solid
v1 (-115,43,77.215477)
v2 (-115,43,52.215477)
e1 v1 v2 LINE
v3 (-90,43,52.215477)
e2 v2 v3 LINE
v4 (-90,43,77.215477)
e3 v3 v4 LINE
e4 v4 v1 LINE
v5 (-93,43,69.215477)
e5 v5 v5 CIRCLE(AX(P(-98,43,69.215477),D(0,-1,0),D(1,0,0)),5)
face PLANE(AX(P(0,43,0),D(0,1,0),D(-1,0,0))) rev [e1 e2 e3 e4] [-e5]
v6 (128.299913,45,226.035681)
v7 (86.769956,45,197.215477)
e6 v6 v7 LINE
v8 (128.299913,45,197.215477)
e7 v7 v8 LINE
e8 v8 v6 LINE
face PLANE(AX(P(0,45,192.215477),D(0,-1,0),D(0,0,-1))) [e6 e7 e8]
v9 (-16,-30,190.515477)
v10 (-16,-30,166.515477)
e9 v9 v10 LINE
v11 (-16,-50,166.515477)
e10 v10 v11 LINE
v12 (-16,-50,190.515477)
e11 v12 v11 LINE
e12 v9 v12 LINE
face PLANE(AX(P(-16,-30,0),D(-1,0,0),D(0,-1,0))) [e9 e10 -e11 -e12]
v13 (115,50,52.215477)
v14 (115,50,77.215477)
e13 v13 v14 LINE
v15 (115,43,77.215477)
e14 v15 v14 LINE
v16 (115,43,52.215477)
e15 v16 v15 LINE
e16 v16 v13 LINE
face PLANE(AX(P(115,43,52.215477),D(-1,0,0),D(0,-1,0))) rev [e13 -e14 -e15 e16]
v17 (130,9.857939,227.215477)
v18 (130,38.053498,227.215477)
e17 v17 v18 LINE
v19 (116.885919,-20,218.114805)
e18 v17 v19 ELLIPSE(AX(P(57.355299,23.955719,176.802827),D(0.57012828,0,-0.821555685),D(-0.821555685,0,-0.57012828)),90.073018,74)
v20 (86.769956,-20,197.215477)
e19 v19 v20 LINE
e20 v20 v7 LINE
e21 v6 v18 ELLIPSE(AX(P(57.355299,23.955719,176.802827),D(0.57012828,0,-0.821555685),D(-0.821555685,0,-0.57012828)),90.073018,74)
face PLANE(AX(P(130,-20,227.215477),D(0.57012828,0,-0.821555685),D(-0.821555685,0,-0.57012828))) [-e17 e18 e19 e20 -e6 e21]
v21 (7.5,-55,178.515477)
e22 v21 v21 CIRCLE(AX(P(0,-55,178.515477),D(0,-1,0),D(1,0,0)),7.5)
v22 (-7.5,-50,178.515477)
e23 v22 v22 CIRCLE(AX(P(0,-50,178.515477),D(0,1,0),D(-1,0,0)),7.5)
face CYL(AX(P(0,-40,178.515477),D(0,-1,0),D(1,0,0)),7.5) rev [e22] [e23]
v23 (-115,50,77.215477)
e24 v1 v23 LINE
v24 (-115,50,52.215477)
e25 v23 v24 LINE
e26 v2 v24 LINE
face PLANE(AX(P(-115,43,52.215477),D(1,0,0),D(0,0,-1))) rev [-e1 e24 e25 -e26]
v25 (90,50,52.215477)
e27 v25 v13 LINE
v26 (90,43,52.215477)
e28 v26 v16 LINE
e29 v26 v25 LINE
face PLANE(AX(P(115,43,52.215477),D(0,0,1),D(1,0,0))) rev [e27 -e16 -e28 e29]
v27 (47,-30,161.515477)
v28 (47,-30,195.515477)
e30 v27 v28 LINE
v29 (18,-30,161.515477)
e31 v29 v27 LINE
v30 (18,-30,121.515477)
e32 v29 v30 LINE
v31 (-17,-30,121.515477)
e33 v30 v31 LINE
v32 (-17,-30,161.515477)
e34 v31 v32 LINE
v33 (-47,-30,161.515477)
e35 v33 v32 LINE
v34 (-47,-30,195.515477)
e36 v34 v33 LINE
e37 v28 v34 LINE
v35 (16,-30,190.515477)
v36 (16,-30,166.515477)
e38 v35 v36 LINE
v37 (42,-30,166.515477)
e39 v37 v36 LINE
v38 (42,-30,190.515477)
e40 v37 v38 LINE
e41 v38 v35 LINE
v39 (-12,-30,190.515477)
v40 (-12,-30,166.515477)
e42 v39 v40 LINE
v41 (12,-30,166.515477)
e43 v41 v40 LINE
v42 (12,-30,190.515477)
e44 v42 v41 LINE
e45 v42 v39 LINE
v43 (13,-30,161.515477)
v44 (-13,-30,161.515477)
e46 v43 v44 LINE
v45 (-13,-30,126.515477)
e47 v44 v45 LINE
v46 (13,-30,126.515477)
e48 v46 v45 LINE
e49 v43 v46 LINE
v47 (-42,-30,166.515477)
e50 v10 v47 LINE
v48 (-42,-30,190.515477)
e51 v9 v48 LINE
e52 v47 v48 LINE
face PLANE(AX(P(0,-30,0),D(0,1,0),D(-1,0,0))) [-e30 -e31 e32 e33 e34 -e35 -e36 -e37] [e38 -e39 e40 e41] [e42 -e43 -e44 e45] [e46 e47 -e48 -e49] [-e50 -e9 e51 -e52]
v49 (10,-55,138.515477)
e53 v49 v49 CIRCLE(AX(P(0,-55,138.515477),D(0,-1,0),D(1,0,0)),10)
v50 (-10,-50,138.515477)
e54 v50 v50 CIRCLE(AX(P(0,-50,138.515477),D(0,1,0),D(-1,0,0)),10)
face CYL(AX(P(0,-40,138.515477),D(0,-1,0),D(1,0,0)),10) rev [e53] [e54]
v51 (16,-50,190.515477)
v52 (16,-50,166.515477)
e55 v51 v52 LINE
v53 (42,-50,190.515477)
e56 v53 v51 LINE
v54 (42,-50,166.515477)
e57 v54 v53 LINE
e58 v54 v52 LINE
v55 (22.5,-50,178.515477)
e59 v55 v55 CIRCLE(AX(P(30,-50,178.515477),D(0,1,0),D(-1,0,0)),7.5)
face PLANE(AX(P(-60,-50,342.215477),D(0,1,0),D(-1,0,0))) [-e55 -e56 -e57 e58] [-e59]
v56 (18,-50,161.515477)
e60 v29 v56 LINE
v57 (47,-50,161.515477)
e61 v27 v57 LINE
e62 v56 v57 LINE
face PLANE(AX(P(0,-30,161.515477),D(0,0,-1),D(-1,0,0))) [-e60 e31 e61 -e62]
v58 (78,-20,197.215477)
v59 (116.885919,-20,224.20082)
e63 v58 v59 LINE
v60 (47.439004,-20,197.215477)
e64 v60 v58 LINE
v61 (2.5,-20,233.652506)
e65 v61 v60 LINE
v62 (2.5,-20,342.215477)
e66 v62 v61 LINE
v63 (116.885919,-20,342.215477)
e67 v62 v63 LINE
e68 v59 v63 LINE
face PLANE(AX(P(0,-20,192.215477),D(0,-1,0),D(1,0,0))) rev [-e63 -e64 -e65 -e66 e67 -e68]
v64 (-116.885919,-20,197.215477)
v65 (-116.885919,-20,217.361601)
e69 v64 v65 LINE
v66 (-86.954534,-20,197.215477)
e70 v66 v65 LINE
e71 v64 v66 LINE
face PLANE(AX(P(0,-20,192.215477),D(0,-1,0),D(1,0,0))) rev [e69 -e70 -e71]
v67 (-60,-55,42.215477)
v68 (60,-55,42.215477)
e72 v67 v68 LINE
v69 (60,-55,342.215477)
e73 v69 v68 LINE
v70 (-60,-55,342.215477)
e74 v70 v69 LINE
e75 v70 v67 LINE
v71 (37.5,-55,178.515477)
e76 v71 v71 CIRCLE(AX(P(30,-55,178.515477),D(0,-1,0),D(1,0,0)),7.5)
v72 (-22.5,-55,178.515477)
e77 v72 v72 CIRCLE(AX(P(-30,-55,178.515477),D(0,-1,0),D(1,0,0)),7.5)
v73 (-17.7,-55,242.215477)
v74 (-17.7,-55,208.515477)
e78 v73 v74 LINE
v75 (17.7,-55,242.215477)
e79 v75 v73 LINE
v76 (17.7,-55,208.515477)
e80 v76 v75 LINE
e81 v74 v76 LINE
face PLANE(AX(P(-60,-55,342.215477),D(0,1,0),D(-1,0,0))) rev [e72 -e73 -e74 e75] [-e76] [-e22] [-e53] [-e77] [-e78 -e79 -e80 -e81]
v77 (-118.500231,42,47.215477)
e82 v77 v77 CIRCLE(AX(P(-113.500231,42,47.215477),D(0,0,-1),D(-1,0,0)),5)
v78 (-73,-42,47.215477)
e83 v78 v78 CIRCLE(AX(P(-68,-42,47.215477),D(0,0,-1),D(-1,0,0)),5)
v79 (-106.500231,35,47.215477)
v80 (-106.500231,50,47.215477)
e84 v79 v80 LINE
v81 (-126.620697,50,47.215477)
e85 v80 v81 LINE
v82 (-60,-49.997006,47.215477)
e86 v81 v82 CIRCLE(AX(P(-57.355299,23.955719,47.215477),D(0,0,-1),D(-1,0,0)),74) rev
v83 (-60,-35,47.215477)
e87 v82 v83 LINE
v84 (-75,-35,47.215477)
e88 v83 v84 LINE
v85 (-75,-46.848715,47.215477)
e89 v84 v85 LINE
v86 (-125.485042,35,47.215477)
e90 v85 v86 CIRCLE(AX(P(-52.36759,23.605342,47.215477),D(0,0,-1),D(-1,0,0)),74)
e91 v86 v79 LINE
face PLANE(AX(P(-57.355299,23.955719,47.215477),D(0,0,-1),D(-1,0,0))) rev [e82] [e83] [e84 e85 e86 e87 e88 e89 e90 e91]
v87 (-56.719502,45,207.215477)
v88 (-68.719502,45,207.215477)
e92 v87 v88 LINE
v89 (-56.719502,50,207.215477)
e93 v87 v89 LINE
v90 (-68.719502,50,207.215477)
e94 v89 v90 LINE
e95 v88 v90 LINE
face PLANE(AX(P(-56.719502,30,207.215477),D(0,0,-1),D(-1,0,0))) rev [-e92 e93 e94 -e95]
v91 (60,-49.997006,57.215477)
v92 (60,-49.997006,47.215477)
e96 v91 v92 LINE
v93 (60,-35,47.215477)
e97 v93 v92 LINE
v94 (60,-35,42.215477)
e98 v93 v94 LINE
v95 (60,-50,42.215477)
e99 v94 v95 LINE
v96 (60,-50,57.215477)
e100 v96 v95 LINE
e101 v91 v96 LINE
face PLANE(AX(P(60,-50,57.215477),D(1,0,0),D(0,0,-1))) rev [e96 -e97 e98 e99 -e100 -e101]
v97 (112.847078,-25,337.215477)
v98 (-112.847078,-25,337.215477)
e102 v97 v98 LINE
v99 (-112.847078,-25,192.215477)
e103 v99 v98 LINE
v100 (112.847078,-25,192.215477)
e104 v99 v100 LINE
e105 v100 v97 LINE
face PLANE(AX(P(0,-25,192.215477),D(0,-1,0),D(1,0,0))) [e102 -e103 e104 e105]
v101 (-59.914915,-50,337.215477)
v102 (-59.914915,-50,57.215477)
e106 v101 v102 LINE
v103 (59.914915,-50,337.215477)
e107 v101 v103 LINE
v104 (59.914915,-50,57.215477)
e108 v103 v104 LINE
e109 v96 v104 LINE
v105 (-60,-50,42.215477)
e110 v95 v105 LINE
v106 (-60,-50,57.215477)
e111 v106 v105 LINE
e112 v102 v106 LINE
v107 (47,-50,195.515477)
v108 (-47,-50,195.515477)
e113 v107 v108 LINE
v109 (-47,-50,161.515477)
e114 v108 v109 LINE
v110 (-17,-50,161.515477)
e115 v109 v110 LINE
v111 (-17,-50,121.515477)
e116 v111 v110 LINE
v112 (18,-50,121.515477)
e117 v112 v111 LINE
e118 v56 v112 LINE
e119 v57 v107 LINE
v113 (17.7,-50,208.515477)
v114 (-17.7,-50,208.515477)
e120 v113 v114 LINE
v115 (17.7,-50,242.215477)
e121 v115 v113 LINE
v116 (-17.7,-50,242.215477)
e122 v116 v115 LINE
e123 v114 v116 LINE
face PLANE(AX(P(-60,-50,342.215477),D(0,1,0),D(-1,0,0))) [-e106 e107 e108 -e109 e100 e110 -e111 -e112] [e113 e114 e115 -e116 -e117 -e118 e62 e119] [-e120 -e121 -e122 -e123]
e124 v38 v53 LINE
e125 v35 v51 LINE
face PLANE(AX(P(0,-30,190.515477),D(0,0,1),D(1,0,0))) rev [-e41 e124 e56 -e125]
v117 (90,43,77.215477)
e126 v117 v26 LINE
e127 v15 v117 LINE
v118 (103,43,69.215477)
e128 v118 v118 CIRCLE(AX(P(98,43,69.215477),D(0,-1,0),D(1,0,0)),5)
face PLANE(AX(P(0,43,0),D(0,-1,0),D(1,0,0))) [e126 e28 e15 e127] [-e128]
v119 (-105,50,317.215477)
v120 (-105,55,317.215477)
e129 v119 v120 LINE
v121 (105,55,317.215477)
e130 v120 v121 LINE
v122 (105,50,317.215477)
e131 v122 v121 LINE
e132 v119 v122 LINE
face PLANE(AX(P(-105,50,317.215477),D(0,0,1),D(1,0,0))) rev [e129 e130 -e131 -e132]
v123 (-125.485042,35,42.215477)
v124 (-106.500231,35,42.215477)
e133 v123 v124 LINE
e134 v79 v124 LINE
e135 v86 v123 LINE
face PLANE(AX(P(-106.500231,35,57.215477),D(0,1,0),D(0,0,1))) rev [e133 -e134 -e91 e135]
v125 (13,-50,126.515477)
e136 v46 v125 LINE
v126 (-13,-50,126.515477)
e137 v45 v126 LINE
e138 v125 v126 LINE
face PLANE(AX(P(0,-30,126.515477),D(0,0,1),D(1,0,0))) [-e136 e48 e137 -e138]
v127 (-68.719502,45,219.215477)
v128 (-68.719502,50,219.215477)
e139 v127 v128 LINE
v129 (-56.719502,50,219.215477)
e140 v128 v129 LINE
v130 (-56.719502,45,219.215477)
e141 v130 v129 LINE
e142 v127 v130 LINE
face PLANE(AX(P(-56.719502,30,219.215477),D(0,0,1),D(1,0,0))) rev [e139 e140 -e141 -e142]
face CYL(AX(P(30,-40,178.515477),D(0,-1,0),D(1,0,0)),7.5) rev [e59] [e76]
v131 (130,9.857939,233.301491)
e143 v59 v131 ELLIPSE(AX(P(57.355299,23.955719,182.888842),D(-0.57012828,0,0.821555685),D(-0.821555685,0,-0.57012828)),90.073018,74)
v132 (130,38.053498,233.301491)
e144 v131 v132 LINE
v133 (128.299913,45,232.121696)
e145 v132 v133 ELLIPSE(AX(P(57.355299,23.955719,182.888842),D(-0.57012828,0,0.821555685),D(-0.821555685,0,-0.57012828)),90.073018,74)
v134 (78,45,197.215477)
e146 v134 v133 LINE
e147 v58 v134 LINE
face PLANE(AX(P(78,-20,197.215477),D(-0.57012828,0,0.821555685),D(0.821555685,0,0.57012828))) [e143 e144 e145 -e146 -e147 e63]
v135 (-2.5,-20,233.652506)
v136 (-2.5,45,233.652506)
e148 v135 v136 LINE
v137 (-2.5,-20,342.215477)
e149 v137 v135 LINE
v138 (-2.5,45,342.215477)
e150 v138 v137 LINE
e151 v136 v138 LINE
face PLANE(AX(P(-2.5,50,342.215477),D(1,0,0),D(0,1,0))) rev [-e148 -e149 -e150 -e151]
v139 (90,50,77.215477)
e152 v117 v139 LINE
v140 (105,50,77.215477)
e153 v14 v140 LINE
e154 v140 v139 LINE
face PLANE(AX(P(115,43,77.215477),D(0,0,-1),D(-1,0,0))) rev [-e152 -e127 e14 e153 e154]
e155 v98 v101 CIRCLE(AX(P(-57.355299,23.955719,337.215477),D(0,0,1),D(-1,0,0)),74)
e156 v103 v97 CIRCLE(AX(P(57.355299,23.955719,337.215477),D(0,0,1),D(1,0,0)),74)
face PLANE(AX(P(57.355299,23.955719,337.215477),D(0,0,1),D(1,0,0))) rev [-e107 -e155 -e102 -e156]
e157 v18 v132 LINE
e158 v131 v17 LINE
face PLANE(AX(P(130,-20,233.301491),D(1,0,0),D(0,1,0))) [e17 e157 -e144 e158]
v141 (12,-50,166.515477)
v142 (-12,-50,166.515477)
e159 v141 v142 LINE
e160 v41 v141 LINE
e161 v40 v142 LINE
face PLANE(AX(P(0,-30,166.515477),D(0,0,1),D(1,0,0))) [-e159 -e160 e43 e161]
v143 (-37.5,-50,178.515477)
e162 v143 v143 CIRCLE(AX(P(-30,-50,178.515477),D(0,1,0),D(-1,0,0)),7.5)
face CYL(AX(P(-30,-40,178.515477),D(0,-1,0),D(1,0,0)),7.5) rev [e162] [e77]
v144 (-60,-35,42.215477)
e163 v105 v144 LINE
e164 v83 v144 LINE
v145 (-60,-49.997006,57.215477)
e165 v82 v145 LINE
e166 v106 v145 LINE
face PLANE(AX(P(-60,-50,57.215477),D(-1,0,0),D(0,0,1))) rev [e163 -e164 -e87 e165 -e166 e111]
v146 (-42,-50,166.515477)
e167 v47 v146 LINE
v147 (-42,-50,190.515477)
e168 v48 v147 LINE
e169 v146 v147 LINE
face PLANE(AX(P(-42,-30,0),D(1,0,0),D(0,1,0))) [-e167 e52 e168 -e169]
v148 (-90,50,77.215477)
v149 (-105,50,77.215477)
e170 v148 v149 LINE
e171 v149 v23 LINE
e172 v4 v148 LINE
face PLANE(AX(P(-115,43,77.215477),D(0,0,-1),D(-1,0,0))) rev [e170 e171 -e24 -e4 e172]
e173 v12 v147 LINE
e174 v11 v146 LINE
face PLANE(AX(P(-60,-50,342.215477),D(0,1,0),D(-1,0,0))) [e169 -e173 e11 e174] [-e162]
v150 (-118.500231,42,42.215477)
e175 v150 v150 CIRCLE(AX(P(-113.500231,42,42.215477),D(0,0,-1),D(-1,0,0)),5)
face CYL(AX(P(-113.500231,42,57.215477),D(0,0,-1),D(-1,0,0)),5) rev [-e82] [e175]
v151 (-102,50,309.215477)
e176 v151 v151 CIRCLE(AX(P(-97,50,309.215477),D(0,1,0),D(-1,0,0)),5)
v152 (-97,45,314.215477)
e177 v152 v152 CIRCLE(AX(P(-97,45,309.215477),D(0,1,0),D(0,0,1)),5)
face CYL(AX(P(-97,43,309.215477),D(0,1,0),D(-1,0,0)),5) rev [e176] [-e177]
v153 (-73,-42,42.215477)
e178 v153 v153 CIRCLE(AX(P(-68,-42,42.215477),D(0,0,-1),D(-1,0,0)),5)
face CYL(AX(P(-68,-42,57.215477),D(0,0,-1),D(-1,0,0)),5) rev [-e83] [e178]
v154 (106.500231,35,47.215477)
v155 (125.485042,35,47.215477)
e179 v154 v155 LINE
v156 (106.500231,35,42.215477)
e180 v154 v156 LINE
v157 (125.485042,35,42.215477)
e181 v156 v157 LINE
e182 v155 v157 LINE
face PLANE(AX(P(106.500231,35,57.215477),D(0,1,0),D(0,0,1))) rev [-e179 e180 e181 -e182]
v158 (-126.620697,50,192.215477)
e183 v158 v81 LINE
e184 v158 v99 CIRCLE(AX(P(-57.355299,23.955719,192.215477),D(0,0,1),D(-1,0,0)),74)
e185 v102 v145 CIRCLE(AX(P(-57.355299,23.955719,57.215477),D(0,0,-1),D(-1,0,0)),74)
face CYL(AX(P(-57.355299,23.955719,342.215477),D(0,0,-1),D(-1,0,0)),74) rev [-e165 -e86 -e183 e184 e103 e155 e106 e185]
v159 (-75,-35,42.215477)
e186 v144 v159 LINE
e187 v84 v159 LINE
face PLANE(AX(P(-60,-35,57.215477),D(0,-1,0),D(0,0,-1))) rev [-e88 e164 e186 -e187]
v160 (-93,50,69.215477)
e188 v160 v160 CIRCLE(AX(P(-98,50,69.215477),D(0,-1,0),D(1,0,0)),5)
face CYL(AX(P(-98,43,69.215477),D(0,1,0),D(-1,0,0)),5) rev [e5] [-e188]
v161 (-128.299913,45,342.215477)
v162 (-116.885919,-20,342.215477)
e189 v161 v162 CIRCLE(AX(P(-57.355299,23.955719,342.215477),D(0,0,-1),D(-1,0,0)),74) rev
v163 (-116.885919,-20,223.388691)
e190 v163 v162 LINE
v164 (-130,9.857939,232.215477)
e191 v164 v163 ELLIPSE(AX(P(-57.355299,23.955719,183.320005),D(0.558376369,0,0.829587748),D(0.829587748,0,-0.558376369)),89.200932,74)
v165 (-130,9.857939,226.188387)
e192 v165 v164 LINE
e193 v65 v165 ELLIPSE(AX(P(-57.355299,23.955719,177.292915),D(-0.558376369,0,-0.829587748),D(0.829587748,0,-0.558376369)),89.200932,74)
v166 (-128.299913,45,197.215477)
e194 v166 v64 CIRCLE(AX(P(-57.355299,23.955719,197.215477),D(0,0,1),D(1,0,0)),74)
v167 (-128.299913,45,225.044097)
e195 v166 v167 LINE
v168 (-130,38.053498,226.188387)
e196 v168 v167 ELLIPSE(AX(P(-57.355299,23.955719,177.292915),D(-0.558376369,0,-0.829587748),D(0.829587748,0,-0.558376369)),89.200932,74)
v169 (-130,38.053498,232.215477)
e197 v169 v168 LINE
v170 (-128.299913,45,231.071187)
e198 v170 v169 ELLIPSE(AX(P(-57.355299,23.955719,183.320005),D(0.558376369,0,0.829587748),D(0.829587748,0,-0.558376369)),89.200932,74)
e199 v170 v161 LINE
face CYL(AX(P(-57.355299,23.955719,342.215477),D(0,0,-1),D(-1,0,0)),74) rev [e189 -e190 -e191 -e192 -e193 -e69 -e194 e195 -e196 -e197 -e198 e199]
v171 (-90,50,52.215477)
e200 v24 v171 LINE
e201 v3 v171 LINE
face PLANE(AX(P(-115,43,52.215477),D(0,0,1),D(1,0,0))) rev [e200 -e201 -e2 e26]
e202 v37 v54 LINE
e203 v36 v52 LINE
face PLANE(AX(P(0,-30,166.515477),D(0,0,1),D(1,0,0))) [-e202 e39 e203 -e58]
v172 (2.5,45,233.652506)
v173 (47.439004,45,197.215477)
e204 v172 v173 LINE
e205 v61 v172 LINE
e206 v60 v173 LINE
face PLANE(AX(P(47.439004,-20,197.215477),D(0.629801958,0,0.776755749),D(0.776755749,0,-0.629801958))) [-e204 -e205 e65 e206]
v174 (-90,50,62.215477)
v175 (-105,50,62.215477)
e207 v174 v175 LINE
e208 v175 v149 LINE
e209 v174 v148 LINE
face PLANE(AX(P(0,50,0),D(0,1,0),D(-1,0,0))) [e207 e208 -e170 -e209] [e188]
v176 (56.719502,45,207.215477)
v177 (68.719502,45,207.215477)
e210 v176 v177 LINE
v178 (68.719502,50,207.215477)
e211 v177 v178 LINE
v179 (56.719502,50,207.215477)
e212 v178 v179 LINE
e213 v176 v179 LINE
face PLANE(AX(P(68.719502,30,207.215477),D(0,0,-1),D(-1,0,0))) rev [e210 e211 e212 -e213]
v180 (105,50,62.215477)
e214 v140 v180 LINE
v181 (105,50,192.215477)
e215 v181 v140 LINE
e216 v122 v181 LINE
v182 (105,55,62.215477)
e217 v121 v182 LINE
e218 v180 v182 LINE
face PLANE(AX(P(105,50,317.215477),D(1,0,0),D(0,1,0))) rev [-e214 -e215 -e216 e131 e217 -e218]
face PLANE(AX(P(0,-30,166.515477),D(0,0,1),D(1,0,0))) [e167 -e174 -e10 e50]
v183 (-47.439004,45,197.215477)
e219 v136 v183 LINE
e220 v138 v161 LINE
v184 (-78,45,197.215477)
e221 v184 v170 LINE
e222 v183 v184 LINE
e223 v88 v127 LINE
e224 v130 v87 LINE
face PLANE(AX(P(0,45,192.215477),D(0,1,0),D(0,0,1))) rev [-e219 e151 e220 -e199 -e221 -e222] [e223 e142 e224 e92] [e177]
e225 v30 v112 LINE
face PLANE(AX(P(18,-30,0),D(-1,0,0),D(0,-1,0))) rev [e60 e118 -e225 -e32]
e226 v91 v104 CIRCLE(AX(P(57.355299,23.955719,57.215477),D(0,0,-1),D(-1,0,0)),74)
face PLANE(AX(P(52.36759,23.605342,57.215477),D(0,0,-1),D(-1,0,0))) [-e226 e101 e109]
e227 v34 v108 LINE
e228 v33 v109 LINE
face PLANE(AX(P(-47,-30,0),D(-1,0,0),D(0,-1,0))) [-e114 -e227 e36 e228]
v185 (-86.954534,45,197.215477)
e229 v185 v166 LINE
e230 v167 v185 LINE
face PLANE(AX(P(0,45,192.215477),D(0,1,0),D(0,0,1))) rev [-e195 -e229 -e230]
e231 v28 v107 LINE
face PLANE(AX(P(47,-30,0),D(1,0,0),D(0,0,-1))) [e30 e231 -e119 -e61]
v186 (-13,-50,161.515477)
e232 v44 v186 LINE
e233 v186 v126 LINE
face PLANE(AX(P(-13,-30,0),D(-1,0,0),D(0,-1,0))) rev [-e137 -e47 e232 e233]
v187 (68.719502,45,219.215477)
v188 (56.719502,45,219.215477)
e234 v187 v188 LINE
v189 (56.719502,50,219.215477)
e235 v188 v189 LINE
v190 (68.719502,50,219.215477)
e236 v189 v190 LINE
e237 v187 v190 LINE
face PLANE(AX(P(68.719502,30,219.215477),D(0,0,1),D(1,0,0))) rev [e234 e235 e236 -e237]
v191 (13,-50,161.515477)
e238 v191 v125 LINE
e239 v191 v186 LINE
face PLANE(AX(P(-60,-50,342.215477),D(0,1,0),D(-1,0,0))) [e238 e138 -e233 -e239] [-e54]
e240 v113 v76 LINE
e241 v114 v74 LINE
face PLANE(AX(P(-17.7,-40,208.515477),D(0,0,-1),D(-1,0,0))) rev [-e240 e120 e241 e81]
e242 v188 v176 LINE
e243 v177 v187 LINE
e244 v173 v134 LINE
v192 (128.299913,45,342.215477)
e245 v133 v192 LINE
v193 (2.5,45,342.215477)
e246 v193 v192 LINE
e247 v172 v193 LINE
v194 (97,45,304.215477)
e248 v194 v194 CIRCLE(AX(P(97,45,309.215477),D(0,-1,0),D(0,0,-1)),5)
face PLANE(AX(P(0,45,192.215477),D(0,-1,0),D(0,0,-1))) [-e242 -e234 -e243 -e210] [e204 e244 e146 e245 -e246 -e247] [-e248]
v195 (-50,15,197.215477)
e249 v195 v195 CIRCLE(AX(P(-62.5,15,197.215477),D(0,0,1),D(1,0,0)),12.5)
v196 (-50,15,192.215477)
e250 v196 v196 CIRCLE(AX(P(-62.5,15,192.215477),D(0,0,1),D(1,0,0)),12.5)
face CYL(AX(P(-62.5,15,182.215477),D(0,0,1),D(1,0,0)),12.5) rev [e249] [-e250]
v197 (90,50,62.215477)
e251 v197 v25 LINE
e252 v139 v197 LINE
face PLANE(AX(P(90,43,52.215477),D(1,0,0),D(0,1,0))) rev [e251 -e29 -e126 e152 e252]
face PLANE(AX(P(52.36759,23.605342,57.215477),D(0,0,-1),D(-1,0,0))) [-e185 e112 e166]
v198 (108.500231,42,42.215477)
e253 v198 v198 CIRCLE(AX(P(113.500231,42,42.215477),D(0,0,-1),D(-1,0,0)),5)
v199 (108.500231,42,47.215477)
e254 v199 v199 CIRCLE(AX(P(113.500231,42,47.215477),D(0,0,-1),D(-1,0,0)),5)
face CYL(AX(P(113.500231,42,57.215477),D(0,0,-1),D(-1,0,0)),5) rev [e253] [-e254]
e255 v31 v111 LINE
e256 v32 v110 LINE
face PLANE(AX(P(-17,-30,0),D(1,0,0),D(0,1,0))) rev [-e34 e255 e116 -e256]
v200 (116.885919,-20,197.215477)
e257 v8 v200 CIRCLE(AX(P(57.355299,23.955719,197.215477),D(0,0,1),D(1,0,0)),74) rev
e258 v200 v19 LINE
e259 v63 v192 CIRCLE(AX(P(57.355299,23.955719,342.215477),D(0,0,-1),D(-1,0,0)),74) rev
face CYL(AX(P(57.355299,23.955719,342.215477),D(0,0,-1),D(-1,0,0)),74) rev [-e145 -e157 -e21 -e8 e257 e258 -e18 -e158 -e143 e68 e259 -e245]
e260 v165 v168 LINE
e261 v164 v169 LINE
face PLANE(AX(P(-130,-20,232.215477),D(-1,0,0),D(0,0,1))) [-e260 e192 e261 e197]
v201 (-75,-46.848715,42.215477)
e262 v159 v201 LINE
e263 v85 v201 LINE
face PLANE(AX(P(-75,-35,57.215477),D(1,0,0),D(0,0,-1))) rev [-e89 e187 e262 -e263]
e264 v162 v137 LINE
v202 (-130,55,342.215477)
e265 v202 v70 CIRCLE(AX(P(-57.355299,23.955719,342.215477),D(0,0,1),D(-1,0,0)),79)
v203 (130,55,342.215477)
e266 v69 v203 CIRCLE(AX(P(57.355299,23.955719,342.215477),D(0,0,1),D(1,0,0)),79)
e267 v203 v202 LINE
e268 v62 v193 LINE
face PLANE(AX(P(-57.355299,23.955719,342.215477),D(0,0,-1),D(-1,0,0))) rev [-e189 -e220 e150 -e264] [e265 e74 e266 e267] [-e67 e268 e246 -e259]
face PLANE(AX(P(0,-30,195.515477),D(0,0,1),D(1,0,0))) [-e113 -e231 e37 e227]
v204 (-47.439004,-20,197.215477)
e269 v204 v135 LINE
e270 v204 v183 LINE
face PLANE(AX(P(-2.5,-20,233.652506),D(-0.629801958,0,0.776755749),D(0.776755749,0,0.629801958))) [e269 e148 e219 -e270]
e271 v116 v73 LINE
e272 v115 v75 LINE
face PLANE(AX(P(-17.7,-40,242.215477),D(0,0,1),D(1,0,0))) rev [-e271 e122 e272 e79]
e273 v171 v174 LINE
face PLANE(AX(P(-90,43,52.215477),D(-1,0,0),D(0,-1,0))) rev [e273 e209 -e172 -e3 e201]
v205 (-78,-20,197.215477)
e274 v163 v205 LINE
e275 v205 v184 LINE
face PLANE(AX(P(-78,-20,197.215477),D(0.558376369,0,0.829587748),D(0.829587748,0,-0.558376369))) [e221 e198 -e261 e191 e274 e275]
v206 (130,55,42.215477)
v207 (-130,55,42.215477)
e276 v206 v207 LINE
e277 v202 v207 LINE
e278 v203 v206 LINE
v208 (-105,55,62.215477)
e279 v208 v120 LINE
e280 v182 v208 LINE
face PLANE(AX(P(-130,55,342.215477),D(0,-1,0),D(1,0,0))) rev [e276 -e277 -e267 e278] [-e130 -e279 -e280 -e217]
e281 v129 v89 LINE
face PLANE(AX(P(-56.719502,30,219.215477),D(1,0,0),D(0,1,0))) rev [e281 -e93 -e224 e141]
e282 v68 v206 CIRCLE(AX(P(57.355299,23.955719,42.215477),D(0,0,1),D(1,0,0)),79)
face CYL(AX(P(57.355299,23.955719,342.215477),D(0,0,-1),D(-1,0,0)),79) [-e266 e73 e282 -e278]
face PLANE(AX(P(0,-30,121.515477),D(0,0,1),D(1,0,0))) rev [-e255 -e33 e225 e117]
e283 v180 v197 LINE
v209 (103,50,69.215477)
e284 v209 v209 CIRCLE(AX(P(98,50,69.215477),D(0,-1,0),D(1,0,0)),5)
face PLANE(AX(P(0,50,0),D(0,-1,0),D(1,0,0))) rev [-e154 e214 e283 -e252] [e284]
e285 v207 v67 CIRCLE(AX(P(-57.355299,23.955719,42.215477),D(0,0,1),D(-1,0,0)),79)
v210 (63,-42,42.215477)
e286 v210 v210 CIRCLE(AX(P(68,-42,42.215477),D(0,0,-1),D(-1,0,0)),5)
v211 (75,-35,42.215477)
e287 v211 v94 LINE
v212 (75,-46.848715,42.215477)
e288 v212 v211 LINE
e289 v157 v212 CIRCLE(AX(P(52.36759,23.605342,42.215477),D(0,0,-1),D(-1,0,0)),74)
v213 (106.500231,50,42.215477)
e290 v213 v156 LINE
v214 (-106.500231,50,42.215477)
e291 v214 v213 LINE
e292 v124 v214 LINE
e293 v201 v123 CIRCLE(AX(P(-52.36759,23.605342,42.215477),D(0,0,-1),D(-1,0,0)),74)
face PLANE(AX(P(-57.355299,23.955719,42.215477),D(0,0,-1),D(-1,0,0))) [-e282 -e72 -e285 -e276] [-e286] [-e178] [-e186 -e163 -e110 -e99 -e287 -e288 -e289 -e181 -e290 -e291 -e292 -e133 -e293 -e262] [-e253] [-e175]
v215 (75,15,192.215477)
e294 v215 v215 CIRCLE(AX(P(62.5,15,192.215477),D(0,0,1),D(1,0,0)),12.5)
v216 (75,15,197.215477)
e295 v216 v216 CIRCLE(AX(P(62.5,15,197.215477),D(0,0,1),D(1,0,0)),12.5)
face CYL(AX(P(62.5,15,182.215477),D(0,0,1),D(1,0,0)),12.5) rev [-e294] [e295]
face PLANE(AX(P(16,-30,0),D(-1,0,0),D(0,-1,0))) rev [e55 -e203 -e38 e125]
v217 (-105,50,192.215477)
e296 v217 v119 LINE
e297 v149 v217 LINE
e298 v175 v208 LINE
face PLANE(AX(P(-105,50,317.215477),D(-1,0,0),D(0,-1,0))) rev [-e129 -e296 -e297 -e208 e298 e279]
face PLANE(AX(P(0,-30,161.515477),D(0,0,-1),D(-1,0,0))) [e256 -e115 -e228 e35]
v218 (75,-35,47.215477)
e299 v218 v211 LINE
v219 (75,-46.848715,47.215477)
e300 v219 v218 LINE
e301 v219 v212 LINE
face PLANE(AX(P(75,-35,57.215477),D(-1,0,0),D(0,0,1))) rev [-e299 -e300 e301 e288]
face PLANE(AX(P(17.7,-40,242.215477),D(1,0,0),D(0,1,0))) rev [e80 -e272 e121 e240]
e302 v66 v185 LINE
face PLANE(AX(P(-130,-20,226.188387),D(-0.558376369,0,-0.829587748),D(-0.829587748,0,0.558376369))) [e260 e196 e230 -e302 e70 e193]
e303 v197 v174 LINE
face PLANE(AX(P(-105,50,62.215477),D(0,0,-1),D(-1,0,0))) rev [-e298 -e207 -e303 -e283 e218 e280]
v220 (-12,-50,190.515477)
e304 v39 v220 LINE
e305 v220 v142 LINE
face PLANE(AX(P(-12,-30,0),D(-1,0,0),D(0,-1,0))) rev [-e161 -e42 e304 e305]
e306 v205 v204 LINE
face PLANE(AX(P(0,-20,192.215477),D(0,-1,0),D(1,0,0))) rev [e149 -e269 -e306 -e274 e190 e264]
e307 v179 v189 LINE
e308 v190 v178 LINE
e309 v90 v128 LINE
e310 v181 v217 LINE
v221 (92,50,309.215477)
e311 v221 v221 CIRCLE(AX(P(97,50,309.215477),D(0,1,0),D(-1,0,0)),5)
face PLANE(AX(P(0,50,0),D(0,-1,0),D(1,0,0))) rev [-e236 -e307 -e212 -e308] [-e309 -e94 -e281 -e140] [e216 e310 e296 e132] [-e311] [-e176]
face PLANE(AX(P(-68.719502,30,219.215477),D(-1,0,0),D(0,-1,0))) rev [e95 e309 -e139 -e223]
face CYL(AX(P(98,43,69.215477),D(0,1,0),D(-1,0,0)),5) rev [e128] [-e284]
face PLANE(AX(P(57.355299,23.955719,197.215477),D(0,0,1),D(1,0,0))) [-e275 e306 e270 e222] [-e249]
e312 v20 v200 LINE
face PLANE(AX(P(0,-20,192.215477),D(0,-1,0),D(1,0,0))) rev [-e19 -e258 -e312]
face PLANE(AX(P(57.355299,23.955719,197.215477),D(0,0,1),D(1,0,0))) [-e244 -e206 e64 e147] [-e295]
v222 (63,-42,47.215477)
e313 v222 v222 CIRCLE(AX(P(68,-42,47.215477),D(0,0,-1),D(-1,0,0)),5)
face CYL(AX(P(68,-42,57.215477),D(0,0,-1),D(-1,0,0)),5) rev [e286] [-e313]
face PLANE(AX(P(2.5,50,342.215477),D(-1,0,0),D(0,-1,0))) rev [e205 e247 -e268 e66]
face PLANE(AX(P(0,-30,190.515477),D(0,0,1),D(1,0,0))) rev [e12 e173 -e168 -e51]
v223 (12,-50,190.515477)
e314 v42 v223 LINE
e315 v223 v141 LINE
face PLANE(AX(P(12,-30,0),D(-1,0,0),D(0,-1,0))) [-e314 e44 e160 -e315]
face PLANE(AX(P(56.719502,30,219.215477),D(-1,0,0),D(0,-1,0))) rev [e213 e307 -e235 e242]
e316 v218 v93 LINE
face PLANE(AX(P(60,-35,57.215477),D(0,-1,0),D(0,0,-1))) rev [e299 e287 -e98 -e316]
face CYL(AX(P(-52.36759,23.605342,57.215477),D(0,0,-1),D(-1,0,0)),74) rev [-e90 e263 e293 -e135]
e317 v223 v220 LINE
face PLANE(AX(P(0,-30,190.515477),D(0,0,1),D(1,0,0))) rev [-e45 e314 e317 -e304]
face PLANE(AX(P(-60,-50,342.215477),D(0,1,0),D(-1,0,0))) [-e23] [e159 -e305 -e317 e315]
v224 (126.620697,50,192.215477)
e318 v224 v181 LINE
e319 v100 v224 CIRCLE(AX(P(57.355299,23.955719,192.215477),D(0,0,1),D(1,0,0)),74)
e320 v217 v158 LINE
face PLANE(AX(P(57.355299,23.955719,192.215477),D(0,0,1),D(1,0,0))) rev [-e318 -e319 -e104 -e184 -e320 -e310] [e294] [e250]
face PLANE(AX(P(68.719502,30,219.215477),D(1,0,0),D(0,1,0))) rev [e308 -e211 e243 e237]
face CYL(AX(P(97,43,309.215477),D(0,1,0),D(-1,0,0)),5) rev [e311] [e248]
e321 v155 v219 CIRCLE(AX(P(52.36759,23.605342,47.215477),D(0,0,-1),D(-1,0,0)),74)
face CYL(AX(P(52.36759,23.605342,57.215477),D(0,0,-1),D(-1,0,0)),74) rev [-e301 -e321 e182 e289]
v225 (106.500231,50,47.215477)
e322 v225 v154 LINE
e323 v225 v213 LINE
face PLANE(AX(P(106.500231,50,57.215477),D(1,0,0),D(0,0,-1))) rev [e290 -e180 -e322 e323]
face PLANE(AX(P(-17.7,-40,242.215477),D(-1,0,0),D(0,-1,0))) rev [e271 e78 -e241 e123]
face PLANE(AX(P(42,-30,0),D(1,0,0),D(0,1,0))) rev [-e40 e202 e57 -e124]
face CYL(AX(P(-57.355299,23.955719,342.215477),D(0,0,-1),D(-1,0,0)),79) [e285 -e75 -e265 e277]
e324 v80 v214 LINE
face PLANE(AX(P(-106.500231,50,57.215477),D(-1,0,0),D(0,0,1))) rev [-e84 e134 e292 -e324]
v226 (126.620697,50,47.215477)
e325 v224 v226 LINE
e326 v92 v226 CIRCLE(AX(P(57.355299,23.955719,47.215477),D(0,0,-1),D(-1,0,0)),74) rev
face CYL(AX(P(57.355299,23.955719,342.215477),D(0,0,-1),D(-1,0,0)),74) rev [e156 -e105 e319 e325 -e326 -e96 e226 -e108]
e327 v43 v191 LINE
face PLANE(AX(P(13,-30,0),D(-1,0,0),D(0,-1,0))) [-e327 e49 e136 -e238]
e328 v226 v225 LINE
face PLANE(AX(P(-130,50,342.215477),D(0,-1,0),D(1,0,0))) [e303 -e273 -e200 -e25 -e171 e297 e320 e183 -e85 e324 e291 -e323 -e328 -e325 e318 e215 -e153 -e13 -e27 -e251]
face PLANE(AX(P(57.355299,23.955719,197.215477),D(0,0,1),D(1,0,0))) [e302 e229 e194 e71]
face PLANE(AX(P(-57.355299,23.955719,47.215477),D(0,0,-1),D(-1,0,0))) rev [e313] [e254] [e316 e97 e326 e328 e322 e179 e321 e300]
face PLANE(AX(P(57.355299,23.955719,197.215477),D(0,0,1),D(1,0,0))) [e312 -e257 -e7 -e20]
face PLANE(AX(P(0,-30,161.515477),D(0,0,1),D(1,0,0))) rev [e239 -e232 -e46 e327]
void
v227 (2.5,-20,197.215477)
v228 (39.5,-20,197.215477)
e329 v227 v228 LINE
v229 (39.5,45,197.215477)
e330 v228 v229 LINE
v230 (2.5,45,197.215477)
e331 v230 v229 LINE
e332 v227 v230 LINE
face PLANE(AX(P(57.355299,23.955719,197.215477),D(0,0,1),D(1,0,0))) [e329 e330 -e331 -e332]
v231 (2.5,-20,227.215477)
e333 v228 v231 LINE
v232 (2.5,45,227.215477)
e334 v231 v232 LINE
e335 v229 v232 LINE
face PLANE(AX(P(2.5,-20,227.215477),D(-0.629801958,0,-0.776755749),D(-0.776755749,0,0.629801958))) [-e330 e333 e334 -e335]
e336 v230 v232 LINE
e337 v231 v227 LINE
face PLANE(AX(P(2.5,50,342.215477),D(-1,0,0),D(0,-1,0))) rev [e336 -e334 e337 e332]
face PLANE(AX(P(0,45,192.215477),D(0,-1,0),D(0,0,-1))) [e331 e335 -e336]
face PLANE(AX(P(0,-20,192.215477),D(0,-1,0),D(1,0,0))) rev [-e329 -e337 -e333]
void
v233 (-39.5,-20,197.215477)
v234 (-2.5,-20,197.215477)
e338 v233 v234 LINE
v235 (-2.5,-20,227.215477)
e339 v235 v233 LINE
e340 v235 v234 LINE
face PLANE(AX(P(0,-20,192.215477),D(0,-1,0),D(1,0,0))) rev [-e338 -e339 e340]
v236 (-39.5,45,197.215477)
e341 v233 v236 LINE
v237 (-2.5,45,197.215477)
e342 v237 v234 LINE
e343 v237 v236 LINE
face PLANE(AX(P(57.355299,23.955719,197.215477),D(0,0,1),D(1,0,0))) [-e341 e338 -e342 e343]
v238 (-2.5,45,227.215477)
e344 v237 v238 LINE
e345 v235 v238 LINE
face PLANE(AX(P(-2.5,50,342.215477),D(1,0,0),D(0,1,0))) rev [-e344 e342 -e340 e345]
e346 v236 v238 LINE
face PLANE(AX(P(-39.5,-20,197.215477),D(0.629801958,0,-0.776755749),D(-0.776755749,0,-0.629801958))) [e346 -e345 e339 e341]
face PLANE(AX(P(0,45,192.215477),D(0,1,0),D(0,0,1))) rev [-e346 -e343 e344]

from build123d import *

# Parameters (mm, degrees)
SALIENTE_EXTRUIR1_DEPTH = 300
VACIADO1_START          = 47.215476502
VACIADO1_DEPTH          = 295
CROQUIS3_R              = 7.5
CROQUIS3_R_2            = 10
CROQUIS3_W              = 35.4
CROQUIS3_H              = 33.7
CORTAR_EXTRUIR1_DEPTH   = 15
SALIENTE_EXTRUIR2_START = -150
SALIENTE_EXTRUIR2_DEPTH = 150
VACIADO3_START          = 197.215476502
VACIADO3_DEPTH          = 145
CROQUIS5_W              = 5
CROQUIS5_H              = 70
SALIENTE_EXTRUIR3_DEPTH = 145
CROQUIS6_R              = 12.5
CORTAR_EXTRUIR2_DEPTH   = 15
CROQUIS7_W              = 210
CROQUIS7_H              = 255
CORTAR_EXTRUIR3_DEPTH   = 5
SALIENTE_EXTRUIR4_DEPTH = 70
SALIENTE_EXTRUIR5_START = -150
SALIENTE_EXTRUIR5_DEPTH = 150
CORTAR_EXTRUIR6_START   = -150
CORTAR_EXTRUIR6_DEPTH   = 150
CORTAR_EXTRUIR7_START   = -150
CORTAR_EXTRUIR7_DEPTH   = 150
CORTAR_EXTRUIR9_DEPTH   = 15
CROQUIS19_R             = 5
CORTAR_EXTRUIR10_DEPTH  = 15
SALIENTE_EXTRUIR6_START = -5
SALIENTE_EXTRUIR6_DEPTH = 5
CROQUIS21_W             = 25
CROQUIS21_H             = 25
CROQUIS21_R             = 5
SALIENTE_EXTRUIR7_DEPTH = 7
CROQUIS22_R             = 5
CORTAR_EXTRUIR13_DEPTH  = 7
CROQUIS23_W             = 26
CROQUIS23_H             = 24
CROQUIS23_H_2           = 35
CROQUIS23_W_2           = 24
SALIENTE_EXTRUIR8_DEPTH = 20
CROQUIS24_W             = 12
CROQUIS24_H             = 12
CORTAR_EXTRUIR14_DEPTH  = 20


# Read off the part's stored shape, not the designer's step: Vaciado1, Vaciado3
with BuildPart() as part:
    # Croquis2 → Saliente-Extruir1 (new body)
    with BuildSketch(Plane.XY.offset(42.215476502)):
        with BuildLine():
            Line((-130, 55), (130, 55))
            ThreePointArc((130, 55), (124.004556318, -18.45744493), (60, -55))
            Line((60, -55), (-60, -55))
            ThreePointArc((-60, -55), (-124.004556318, -18.45744493), (-130, 55))
        make_face()
    extrude(amount=SALIENTE_EXTRUIR1_DEPTH)

    # Vaciado1 outline → Vaciado1 (cut)
    with BuildSketch(Plane.XY.offset(VACIADO1_START)):
        with BuildLine():
            ThreePointArc((-126.620697254, 50), (-118.915904499, -17.108764781), (-59.914914782, -50))
            Line((-59.914914782, -50), (59.914914782, -50))
            ThreePointArc((59.914914782, -50), (118.915904499, -17.108764781), (126.620697254, 50))
            Line((126.620697254, 50), (-126.620697254, 50))
        make_face()
    extrude(amount=VACIADO1_DEPTH, mode=Mode.SUBTRACT)

    # Croquis3 → Cortar-Extruir1 (cut)
    with BuildSketch(Plane(origin=(0, -55, 0), x_dir=(-1, 0, 0), z_dir=(0, -1, 0))):
        with Locations(Location((30, -178.515476502, 0), (0, 0, 180))):
            Circle(CROQUIS3_R)
        with Locations(Location((0, -178.515476502, 0), (0, 0, 180))):
            Circle(CROQUIS3_R)
        with Locations(Location((-30, -178.515476502, 0), (0, 0, 180))):
            Circle(CROQUIS3_R)
        with Locations(Location((0, -138.515476502, 0), (0, 0, 180))):
            Circle(CROQUIS3_R_2)
        with Locations((0, -225.365476502)):
            Rectangle(CROQUIS3_W, CROQUIS3_H)
    extrude(amount=-CORTAR_EXTRUIR1_DEPTH, mode=Mode.SUBTRACT)

    # Croquis4 → Saliente-Extruir2 (add)
    with BuildSketch(Plane.XY.offset(342.215476502).offset(SALIENTE_EXTRUIR2_START)):
        with BuildLine():
            Line((0, -25), (-112.847078194, -25))
            ThreePointArc((-112.847078194, -25), (-130.13811515, 10.589281798), (-126.620697254, 50))
            Line((-126.620697254, 50), (0, 50))
            Line((0, 50), (126.620697254, 50))
            ThreePointArc((126.620697254, 50), (130.13811515, 10.589281798), (112.847078194, -25))
            Line((112.847078194, -25), (0, -25))
        make_face()
    extrude(amount=SALIENTE_EXTRUIR2_DEPTH)

    # Vaciado3 outline → Vaciado3 (cut)
    with BuildSketch(Plane.XY.offset(VACIADO3_START)):
        with BuildLine():
            Line((126.620697254, 50), (-126.620697254, 50))
            ThreePointArc((-126.620697254, 50), (-130.649934486, 13.762761692), (-116.885919238, -20))
            Line((-116.885919238, -20), (116.885919238, -20))
            ThreePointArc((116.885919238, -20), (130.649934486, 13.762761692), (126.620697254, 50))
        make_face()
    extrude(amount=VACIADO3_DEPTH, mode=Mode.SUBTRACT)

    # Croquis5 → Saliente-Extruir3 (add)
    with BuildSketch(Plane.XY.offset(197.215476502)):
        with Locations((0, 15)):
            Rectangle(CROQUIS5_W, CROQUIS5_H)
    extrude(amount=SALIENTE_EXTRUIR3_DEPTH)

    # Croquis6 → Cortar-Extruir2 (cut)
    with BuildSketch(Plane.XY.offset(197.215476502)):
        with Locations((-62.5, 15)):
            Circle(CROQUIS6_R)
        with Locations((62.5, 15)):
            Circle(CROQUIS6_R)
    extrude(amount=-CORTAR_EXTRUIR2_DEPTH, mode=Mode.SUBTRACT)

    # Croquis7 → Cortar-Extruir3 (cut)
    with BuildSketch(Plane(origin=(0, 55, 0), x_dir=(1, 0, 0), z_dir=(0, 1, 0))):
        with Locations((0, -189.715476502)):
            Rectangle(CROQUIS7_W, CROQUIS7_H)
    extrude(amount=-CORTAR_EXTRUIR3_DEPTH, mode=Mode.SUBTRACT)

    # Croquis8 → Saliente-Extruir4 (add)
    with BuildSketch(Plane(origin=(0, 50, 0), x_dir=(1, 0, 0), z_dir=(0, 1, 0))):
        Polygon((47.439003576, -197.215476502), (2.5, -233.652506429), (2.5, -227.215476502), (39.5, -197.215476502), align=None)
        Polygon((78, -197.215476502), (130, -233.301491229), (130, -227.215476502), (86.769956122, -197.215476502), align=None)
        Polygon((-2.5, -233.652506429), (-47.439003576, -197.215476502), (-39.5, -197.215476502), (-2.5, -227.215476502), align=None)
        Polygon((-78, -197.215476502), (-130, -232.215476502), (-130, -226.188386524), (-86.954533682, -197.215476502), align=None)
    extrude(amount=-SALIENTE_EXTRUIR4_DEPTH)

    # Croquis10 → Saliente-Extruir5 (add)
    with BuildSketch(Plane.XY.offset(342.215476502).offset(SALIENTE_EXTRUIR5_START)):
        with BuildLine():
            Line((-2.5, 45), (-2.5, 50))
            Line((-2.5, 50), (-126.620697254, 50))
            ThreePointArc((-126.620697254, 50), (-127.504866775, 47.514965781), (-128.299912644, 45))
            Line((-128.299912644, 45), (-126.620697254, 45))
            Line((-126.620697254, 45), (-2.5, 45))
        make_face()
        with BuildLine():
            ThreePointArc((128.299912644, 45), (127.504866775, 47.514965781), (126.620697254, 50))
            Line((126.620697254, 50), (2.5, 50))
            Line((2.5, 50), (2.5, 45))
            Line((2.5, 45), (128.299912644, 45))
        make_face()
    extrude(amount=SALIENTE_EXTRUIR5_DEPTH)

    # Croquis13 → Cortar-Extruir6 (cut)
    with BuildSketch(Plane.XY.offset(342.215476502).offset(CORTAR_EXTRUIR6_START)):
        with BuildLine():
            Line((-130, -7.088562093), (-130, -20))
            Line((-130, -20), (-122.997470988, -20))
            ThreePointArc((-122.997470988, -20), (-126.799457266, -13.707377748), (-130, -7.088562093))
        make_face()
    extrude(amount=CORTAR_EXTRUIR6_DEPTH, mode=Mode.SUBTRACT)

    # Croquis14 → Cortar-Extruir7 (cut)
    with BuildSketch(Plane.XY.offset(342.215476502).offset(CORTAR_EXTRUIR7_START)):
        with BuildLine():
            Line((130, -7.088562093), (130, -20))
            Line((130, -20), (122.997470988, -20))
            ThreePointArc((122.997470988, -20), (126.799457266, -13.707377748), (130, -7.088562093))
        make_face()
    extrude(amount=CORTAR_EXTRUIR7_DEPTH, mode=Mode.SUBTRACT)

    # Croquis18 → Cortar-Extruir9 (cut)
    with BuildSketch(Plane(origin=(0, 0, 42.215476502), x_dir=(-1, 0, 0), z_dir=(0, 0, -1))):
        with BuildLine():
            Line((-106.50023103, 50), (106.50023103, 50))
            Line((106.50023103, 50), (106.50023103, 35))
            Line((106.50023103, 35), (125.485042145, 35))
            ThreePointArc((125.485042145, 35), (115.350222936, -15.242927128), (75, -46.848714508))
            Line((75, -46.848714508), (75, -35))
            Line((75, -35), (60, -35))
            Line((60, -35), (60, -50))
            Line((60, -50), (-60, -50))
            Line((-60, -50), (-60, -35))
            Line((-60, -35), (-75, -35))
            Line((-75, -35), (-75, -46.848714508))
            ThreePointArc((-75, -46.848714508), (-115.350222936, -15.242927128), (-125.485042145, 35))
            Line((-125.485042145, 35), (-106.50023103, 35))
            Line((-106.50023103, 35), (-106.50023103, 50))
        make_face()
    extrude(amount=-CORTAR_EXTRUIR9_DEPTH, mode=Mode.SUBTRACT)

    # Croquis19 → Cortar-Extruir10 (cut)
    with BuildSketch(Plane(origin=(0, 0, 42.215476502), x_dir=(-1, 0, 0), z_dir=(0, 0, -1))):
        with Locations((-113.50023103, 42)):
            Circle(CROQUIS19_R)
        with Locations((113.50023103, 42)):
            Circle(CROQUIS19_R)
        with Locations((68, -42)):
            Circle(CROQUIS19_R)
        with Locations((-68, -42)):
            Circle(CROQUIS19_R)
    extrude(amount=-CORTAR_EXTRUIR10_DEPTH, mode=Mode.SUBTRACT)

    # Croquis20 → Saliente-Extruir6 (add)
    with BuildSketch(Plane.XY.offset(342.215476502).offset(SALIENTE_EXTRUIR6_START)):
        with BuildLine():
            Line((112.847078194, -25), (-112.847078194, -25))
            ThreePointArc((-112.847078194, -25), (-88.958164591, -42.956603327), (-59.914914782, -50))
            Line((-59.914914782, -50), (59.914914782, -50))
            ThreePointArc((59.914914782, -50), (88.958164591, -42.956603327), (112.847078194, -25))
        make_face()
    extrude(amount=SALIENTE_EXTRUIR6_DEPTH)

    # Croquis21 → Saliente-Extruir7 (add)
    # profile 1 of 2: a face of its own
    with BuildSketch(Plane(origin=(0, 50, 0), x_dir=(-1, 0, 0), z_dir=(0, -1, 0))):
        with Locations((-102.5, -64.715476502)):
            Rectangle(CROQUIS21_W, CROQUIS21_H)
        with Locations(Location((-98, -69.215476502, 0), (0, 0, 180))):
            Circle(CROQUIS21_R, mode=Mode.SUBTRACT)
    # profile 2 of 2: a face of its own
    with BuildSketch(Plane(origin=(0, 50, 0), x_dir=(-1, 0, 0), z_dir=(0, -1, 0))):
        with Locations((102.5, -64.715476502)):
            Rectangle(CROQUIS21_W, CROQUIS21_H)
        with Locations(Location((98, -69.215476502, 0), (0, 0, 180))):
            Circle(CROQUIS21_R, mode=Mode.SUBTRACT)
    extrude(amount=SALIENTE_EXTRUIR7_DEPTH)

    # Croquis22 → Cortar-Extruir13 (cut)
    with BuildSketch(Plane(origin=(0, 50, 0), x_dir=(1, 0, 0), z_dir=(0, 1, 0))):
        with Locations(Location((-97, -309.215476502, 0), (0, 0, 180))):
            Circle(CROQUIS22_R)
        with Locations(Location((97, -309.215476502, 0), (0, 0, 180))):
            Circle(CROQUIS22_R)
    extrude(amount=-CORTAR_EXTRUIR13_DEPTH, mode=Mode.SUBTRACT)

    # Croquis23 → Saliente-Extruir8 (add)
    with BuildSketch(Plane(origin=(0, -50, 0), x_dir=(1, 0, 0), z_dir=(0, 1, 0))):
        Polygon((18, -161.515476502), (18, -121.515476502), (-17, -121.515476502), (-17, -161.515476502), (-47, -161.515476502), (-47, -195.515476502), (47, -195.515476502), (47, -161.515476502), align=None)
        with Locations((29, -178.515476502)):
            Rectangle(CROQUIS23_W, CROQUIS23_H, mode=Mode.SUBTRACT)
        with Locations((-29, -178.515476502)):
            Rectangle(CROQUIS23_W, CROQUIS23_H, mode=Mode.SUBTRACT)
        with Locations((0, -144.015476502)):
            Rectangle(CROQUIS23_W, CROQUIS23_H_2, mode=Mode.SUBTRACT)
        with Locations((0, -178.515476502)):
            Rectangle(CROQUIS23_W_2, CROQUIS23_H, mode=Mode.SUBTRACT)
    extrude(amount=SALIENTE_EXTRUIR8_DEPTH)

    # Croquis24 → Cortar-Extruir14 (cut)
    with BuildSketch(Plane(origin=(0, 50, 0), x_dir=(1, 0, 0), z_dir=(0, 1, 0))):
        with Locations((62.719501788, -213.215476502)):
            Rectangle(CROQUIS24_W, CROQUIS24_H)
        with Locations((-62.719501788, -213.215476502)):
            Rectangle(CROQUIS24_W, CROQUIS24_H)
    extrude(amount=-CORTAR_EXTRUIR14_DEPTH, mode=Mode.SUBTRACT)


solid = part.part
